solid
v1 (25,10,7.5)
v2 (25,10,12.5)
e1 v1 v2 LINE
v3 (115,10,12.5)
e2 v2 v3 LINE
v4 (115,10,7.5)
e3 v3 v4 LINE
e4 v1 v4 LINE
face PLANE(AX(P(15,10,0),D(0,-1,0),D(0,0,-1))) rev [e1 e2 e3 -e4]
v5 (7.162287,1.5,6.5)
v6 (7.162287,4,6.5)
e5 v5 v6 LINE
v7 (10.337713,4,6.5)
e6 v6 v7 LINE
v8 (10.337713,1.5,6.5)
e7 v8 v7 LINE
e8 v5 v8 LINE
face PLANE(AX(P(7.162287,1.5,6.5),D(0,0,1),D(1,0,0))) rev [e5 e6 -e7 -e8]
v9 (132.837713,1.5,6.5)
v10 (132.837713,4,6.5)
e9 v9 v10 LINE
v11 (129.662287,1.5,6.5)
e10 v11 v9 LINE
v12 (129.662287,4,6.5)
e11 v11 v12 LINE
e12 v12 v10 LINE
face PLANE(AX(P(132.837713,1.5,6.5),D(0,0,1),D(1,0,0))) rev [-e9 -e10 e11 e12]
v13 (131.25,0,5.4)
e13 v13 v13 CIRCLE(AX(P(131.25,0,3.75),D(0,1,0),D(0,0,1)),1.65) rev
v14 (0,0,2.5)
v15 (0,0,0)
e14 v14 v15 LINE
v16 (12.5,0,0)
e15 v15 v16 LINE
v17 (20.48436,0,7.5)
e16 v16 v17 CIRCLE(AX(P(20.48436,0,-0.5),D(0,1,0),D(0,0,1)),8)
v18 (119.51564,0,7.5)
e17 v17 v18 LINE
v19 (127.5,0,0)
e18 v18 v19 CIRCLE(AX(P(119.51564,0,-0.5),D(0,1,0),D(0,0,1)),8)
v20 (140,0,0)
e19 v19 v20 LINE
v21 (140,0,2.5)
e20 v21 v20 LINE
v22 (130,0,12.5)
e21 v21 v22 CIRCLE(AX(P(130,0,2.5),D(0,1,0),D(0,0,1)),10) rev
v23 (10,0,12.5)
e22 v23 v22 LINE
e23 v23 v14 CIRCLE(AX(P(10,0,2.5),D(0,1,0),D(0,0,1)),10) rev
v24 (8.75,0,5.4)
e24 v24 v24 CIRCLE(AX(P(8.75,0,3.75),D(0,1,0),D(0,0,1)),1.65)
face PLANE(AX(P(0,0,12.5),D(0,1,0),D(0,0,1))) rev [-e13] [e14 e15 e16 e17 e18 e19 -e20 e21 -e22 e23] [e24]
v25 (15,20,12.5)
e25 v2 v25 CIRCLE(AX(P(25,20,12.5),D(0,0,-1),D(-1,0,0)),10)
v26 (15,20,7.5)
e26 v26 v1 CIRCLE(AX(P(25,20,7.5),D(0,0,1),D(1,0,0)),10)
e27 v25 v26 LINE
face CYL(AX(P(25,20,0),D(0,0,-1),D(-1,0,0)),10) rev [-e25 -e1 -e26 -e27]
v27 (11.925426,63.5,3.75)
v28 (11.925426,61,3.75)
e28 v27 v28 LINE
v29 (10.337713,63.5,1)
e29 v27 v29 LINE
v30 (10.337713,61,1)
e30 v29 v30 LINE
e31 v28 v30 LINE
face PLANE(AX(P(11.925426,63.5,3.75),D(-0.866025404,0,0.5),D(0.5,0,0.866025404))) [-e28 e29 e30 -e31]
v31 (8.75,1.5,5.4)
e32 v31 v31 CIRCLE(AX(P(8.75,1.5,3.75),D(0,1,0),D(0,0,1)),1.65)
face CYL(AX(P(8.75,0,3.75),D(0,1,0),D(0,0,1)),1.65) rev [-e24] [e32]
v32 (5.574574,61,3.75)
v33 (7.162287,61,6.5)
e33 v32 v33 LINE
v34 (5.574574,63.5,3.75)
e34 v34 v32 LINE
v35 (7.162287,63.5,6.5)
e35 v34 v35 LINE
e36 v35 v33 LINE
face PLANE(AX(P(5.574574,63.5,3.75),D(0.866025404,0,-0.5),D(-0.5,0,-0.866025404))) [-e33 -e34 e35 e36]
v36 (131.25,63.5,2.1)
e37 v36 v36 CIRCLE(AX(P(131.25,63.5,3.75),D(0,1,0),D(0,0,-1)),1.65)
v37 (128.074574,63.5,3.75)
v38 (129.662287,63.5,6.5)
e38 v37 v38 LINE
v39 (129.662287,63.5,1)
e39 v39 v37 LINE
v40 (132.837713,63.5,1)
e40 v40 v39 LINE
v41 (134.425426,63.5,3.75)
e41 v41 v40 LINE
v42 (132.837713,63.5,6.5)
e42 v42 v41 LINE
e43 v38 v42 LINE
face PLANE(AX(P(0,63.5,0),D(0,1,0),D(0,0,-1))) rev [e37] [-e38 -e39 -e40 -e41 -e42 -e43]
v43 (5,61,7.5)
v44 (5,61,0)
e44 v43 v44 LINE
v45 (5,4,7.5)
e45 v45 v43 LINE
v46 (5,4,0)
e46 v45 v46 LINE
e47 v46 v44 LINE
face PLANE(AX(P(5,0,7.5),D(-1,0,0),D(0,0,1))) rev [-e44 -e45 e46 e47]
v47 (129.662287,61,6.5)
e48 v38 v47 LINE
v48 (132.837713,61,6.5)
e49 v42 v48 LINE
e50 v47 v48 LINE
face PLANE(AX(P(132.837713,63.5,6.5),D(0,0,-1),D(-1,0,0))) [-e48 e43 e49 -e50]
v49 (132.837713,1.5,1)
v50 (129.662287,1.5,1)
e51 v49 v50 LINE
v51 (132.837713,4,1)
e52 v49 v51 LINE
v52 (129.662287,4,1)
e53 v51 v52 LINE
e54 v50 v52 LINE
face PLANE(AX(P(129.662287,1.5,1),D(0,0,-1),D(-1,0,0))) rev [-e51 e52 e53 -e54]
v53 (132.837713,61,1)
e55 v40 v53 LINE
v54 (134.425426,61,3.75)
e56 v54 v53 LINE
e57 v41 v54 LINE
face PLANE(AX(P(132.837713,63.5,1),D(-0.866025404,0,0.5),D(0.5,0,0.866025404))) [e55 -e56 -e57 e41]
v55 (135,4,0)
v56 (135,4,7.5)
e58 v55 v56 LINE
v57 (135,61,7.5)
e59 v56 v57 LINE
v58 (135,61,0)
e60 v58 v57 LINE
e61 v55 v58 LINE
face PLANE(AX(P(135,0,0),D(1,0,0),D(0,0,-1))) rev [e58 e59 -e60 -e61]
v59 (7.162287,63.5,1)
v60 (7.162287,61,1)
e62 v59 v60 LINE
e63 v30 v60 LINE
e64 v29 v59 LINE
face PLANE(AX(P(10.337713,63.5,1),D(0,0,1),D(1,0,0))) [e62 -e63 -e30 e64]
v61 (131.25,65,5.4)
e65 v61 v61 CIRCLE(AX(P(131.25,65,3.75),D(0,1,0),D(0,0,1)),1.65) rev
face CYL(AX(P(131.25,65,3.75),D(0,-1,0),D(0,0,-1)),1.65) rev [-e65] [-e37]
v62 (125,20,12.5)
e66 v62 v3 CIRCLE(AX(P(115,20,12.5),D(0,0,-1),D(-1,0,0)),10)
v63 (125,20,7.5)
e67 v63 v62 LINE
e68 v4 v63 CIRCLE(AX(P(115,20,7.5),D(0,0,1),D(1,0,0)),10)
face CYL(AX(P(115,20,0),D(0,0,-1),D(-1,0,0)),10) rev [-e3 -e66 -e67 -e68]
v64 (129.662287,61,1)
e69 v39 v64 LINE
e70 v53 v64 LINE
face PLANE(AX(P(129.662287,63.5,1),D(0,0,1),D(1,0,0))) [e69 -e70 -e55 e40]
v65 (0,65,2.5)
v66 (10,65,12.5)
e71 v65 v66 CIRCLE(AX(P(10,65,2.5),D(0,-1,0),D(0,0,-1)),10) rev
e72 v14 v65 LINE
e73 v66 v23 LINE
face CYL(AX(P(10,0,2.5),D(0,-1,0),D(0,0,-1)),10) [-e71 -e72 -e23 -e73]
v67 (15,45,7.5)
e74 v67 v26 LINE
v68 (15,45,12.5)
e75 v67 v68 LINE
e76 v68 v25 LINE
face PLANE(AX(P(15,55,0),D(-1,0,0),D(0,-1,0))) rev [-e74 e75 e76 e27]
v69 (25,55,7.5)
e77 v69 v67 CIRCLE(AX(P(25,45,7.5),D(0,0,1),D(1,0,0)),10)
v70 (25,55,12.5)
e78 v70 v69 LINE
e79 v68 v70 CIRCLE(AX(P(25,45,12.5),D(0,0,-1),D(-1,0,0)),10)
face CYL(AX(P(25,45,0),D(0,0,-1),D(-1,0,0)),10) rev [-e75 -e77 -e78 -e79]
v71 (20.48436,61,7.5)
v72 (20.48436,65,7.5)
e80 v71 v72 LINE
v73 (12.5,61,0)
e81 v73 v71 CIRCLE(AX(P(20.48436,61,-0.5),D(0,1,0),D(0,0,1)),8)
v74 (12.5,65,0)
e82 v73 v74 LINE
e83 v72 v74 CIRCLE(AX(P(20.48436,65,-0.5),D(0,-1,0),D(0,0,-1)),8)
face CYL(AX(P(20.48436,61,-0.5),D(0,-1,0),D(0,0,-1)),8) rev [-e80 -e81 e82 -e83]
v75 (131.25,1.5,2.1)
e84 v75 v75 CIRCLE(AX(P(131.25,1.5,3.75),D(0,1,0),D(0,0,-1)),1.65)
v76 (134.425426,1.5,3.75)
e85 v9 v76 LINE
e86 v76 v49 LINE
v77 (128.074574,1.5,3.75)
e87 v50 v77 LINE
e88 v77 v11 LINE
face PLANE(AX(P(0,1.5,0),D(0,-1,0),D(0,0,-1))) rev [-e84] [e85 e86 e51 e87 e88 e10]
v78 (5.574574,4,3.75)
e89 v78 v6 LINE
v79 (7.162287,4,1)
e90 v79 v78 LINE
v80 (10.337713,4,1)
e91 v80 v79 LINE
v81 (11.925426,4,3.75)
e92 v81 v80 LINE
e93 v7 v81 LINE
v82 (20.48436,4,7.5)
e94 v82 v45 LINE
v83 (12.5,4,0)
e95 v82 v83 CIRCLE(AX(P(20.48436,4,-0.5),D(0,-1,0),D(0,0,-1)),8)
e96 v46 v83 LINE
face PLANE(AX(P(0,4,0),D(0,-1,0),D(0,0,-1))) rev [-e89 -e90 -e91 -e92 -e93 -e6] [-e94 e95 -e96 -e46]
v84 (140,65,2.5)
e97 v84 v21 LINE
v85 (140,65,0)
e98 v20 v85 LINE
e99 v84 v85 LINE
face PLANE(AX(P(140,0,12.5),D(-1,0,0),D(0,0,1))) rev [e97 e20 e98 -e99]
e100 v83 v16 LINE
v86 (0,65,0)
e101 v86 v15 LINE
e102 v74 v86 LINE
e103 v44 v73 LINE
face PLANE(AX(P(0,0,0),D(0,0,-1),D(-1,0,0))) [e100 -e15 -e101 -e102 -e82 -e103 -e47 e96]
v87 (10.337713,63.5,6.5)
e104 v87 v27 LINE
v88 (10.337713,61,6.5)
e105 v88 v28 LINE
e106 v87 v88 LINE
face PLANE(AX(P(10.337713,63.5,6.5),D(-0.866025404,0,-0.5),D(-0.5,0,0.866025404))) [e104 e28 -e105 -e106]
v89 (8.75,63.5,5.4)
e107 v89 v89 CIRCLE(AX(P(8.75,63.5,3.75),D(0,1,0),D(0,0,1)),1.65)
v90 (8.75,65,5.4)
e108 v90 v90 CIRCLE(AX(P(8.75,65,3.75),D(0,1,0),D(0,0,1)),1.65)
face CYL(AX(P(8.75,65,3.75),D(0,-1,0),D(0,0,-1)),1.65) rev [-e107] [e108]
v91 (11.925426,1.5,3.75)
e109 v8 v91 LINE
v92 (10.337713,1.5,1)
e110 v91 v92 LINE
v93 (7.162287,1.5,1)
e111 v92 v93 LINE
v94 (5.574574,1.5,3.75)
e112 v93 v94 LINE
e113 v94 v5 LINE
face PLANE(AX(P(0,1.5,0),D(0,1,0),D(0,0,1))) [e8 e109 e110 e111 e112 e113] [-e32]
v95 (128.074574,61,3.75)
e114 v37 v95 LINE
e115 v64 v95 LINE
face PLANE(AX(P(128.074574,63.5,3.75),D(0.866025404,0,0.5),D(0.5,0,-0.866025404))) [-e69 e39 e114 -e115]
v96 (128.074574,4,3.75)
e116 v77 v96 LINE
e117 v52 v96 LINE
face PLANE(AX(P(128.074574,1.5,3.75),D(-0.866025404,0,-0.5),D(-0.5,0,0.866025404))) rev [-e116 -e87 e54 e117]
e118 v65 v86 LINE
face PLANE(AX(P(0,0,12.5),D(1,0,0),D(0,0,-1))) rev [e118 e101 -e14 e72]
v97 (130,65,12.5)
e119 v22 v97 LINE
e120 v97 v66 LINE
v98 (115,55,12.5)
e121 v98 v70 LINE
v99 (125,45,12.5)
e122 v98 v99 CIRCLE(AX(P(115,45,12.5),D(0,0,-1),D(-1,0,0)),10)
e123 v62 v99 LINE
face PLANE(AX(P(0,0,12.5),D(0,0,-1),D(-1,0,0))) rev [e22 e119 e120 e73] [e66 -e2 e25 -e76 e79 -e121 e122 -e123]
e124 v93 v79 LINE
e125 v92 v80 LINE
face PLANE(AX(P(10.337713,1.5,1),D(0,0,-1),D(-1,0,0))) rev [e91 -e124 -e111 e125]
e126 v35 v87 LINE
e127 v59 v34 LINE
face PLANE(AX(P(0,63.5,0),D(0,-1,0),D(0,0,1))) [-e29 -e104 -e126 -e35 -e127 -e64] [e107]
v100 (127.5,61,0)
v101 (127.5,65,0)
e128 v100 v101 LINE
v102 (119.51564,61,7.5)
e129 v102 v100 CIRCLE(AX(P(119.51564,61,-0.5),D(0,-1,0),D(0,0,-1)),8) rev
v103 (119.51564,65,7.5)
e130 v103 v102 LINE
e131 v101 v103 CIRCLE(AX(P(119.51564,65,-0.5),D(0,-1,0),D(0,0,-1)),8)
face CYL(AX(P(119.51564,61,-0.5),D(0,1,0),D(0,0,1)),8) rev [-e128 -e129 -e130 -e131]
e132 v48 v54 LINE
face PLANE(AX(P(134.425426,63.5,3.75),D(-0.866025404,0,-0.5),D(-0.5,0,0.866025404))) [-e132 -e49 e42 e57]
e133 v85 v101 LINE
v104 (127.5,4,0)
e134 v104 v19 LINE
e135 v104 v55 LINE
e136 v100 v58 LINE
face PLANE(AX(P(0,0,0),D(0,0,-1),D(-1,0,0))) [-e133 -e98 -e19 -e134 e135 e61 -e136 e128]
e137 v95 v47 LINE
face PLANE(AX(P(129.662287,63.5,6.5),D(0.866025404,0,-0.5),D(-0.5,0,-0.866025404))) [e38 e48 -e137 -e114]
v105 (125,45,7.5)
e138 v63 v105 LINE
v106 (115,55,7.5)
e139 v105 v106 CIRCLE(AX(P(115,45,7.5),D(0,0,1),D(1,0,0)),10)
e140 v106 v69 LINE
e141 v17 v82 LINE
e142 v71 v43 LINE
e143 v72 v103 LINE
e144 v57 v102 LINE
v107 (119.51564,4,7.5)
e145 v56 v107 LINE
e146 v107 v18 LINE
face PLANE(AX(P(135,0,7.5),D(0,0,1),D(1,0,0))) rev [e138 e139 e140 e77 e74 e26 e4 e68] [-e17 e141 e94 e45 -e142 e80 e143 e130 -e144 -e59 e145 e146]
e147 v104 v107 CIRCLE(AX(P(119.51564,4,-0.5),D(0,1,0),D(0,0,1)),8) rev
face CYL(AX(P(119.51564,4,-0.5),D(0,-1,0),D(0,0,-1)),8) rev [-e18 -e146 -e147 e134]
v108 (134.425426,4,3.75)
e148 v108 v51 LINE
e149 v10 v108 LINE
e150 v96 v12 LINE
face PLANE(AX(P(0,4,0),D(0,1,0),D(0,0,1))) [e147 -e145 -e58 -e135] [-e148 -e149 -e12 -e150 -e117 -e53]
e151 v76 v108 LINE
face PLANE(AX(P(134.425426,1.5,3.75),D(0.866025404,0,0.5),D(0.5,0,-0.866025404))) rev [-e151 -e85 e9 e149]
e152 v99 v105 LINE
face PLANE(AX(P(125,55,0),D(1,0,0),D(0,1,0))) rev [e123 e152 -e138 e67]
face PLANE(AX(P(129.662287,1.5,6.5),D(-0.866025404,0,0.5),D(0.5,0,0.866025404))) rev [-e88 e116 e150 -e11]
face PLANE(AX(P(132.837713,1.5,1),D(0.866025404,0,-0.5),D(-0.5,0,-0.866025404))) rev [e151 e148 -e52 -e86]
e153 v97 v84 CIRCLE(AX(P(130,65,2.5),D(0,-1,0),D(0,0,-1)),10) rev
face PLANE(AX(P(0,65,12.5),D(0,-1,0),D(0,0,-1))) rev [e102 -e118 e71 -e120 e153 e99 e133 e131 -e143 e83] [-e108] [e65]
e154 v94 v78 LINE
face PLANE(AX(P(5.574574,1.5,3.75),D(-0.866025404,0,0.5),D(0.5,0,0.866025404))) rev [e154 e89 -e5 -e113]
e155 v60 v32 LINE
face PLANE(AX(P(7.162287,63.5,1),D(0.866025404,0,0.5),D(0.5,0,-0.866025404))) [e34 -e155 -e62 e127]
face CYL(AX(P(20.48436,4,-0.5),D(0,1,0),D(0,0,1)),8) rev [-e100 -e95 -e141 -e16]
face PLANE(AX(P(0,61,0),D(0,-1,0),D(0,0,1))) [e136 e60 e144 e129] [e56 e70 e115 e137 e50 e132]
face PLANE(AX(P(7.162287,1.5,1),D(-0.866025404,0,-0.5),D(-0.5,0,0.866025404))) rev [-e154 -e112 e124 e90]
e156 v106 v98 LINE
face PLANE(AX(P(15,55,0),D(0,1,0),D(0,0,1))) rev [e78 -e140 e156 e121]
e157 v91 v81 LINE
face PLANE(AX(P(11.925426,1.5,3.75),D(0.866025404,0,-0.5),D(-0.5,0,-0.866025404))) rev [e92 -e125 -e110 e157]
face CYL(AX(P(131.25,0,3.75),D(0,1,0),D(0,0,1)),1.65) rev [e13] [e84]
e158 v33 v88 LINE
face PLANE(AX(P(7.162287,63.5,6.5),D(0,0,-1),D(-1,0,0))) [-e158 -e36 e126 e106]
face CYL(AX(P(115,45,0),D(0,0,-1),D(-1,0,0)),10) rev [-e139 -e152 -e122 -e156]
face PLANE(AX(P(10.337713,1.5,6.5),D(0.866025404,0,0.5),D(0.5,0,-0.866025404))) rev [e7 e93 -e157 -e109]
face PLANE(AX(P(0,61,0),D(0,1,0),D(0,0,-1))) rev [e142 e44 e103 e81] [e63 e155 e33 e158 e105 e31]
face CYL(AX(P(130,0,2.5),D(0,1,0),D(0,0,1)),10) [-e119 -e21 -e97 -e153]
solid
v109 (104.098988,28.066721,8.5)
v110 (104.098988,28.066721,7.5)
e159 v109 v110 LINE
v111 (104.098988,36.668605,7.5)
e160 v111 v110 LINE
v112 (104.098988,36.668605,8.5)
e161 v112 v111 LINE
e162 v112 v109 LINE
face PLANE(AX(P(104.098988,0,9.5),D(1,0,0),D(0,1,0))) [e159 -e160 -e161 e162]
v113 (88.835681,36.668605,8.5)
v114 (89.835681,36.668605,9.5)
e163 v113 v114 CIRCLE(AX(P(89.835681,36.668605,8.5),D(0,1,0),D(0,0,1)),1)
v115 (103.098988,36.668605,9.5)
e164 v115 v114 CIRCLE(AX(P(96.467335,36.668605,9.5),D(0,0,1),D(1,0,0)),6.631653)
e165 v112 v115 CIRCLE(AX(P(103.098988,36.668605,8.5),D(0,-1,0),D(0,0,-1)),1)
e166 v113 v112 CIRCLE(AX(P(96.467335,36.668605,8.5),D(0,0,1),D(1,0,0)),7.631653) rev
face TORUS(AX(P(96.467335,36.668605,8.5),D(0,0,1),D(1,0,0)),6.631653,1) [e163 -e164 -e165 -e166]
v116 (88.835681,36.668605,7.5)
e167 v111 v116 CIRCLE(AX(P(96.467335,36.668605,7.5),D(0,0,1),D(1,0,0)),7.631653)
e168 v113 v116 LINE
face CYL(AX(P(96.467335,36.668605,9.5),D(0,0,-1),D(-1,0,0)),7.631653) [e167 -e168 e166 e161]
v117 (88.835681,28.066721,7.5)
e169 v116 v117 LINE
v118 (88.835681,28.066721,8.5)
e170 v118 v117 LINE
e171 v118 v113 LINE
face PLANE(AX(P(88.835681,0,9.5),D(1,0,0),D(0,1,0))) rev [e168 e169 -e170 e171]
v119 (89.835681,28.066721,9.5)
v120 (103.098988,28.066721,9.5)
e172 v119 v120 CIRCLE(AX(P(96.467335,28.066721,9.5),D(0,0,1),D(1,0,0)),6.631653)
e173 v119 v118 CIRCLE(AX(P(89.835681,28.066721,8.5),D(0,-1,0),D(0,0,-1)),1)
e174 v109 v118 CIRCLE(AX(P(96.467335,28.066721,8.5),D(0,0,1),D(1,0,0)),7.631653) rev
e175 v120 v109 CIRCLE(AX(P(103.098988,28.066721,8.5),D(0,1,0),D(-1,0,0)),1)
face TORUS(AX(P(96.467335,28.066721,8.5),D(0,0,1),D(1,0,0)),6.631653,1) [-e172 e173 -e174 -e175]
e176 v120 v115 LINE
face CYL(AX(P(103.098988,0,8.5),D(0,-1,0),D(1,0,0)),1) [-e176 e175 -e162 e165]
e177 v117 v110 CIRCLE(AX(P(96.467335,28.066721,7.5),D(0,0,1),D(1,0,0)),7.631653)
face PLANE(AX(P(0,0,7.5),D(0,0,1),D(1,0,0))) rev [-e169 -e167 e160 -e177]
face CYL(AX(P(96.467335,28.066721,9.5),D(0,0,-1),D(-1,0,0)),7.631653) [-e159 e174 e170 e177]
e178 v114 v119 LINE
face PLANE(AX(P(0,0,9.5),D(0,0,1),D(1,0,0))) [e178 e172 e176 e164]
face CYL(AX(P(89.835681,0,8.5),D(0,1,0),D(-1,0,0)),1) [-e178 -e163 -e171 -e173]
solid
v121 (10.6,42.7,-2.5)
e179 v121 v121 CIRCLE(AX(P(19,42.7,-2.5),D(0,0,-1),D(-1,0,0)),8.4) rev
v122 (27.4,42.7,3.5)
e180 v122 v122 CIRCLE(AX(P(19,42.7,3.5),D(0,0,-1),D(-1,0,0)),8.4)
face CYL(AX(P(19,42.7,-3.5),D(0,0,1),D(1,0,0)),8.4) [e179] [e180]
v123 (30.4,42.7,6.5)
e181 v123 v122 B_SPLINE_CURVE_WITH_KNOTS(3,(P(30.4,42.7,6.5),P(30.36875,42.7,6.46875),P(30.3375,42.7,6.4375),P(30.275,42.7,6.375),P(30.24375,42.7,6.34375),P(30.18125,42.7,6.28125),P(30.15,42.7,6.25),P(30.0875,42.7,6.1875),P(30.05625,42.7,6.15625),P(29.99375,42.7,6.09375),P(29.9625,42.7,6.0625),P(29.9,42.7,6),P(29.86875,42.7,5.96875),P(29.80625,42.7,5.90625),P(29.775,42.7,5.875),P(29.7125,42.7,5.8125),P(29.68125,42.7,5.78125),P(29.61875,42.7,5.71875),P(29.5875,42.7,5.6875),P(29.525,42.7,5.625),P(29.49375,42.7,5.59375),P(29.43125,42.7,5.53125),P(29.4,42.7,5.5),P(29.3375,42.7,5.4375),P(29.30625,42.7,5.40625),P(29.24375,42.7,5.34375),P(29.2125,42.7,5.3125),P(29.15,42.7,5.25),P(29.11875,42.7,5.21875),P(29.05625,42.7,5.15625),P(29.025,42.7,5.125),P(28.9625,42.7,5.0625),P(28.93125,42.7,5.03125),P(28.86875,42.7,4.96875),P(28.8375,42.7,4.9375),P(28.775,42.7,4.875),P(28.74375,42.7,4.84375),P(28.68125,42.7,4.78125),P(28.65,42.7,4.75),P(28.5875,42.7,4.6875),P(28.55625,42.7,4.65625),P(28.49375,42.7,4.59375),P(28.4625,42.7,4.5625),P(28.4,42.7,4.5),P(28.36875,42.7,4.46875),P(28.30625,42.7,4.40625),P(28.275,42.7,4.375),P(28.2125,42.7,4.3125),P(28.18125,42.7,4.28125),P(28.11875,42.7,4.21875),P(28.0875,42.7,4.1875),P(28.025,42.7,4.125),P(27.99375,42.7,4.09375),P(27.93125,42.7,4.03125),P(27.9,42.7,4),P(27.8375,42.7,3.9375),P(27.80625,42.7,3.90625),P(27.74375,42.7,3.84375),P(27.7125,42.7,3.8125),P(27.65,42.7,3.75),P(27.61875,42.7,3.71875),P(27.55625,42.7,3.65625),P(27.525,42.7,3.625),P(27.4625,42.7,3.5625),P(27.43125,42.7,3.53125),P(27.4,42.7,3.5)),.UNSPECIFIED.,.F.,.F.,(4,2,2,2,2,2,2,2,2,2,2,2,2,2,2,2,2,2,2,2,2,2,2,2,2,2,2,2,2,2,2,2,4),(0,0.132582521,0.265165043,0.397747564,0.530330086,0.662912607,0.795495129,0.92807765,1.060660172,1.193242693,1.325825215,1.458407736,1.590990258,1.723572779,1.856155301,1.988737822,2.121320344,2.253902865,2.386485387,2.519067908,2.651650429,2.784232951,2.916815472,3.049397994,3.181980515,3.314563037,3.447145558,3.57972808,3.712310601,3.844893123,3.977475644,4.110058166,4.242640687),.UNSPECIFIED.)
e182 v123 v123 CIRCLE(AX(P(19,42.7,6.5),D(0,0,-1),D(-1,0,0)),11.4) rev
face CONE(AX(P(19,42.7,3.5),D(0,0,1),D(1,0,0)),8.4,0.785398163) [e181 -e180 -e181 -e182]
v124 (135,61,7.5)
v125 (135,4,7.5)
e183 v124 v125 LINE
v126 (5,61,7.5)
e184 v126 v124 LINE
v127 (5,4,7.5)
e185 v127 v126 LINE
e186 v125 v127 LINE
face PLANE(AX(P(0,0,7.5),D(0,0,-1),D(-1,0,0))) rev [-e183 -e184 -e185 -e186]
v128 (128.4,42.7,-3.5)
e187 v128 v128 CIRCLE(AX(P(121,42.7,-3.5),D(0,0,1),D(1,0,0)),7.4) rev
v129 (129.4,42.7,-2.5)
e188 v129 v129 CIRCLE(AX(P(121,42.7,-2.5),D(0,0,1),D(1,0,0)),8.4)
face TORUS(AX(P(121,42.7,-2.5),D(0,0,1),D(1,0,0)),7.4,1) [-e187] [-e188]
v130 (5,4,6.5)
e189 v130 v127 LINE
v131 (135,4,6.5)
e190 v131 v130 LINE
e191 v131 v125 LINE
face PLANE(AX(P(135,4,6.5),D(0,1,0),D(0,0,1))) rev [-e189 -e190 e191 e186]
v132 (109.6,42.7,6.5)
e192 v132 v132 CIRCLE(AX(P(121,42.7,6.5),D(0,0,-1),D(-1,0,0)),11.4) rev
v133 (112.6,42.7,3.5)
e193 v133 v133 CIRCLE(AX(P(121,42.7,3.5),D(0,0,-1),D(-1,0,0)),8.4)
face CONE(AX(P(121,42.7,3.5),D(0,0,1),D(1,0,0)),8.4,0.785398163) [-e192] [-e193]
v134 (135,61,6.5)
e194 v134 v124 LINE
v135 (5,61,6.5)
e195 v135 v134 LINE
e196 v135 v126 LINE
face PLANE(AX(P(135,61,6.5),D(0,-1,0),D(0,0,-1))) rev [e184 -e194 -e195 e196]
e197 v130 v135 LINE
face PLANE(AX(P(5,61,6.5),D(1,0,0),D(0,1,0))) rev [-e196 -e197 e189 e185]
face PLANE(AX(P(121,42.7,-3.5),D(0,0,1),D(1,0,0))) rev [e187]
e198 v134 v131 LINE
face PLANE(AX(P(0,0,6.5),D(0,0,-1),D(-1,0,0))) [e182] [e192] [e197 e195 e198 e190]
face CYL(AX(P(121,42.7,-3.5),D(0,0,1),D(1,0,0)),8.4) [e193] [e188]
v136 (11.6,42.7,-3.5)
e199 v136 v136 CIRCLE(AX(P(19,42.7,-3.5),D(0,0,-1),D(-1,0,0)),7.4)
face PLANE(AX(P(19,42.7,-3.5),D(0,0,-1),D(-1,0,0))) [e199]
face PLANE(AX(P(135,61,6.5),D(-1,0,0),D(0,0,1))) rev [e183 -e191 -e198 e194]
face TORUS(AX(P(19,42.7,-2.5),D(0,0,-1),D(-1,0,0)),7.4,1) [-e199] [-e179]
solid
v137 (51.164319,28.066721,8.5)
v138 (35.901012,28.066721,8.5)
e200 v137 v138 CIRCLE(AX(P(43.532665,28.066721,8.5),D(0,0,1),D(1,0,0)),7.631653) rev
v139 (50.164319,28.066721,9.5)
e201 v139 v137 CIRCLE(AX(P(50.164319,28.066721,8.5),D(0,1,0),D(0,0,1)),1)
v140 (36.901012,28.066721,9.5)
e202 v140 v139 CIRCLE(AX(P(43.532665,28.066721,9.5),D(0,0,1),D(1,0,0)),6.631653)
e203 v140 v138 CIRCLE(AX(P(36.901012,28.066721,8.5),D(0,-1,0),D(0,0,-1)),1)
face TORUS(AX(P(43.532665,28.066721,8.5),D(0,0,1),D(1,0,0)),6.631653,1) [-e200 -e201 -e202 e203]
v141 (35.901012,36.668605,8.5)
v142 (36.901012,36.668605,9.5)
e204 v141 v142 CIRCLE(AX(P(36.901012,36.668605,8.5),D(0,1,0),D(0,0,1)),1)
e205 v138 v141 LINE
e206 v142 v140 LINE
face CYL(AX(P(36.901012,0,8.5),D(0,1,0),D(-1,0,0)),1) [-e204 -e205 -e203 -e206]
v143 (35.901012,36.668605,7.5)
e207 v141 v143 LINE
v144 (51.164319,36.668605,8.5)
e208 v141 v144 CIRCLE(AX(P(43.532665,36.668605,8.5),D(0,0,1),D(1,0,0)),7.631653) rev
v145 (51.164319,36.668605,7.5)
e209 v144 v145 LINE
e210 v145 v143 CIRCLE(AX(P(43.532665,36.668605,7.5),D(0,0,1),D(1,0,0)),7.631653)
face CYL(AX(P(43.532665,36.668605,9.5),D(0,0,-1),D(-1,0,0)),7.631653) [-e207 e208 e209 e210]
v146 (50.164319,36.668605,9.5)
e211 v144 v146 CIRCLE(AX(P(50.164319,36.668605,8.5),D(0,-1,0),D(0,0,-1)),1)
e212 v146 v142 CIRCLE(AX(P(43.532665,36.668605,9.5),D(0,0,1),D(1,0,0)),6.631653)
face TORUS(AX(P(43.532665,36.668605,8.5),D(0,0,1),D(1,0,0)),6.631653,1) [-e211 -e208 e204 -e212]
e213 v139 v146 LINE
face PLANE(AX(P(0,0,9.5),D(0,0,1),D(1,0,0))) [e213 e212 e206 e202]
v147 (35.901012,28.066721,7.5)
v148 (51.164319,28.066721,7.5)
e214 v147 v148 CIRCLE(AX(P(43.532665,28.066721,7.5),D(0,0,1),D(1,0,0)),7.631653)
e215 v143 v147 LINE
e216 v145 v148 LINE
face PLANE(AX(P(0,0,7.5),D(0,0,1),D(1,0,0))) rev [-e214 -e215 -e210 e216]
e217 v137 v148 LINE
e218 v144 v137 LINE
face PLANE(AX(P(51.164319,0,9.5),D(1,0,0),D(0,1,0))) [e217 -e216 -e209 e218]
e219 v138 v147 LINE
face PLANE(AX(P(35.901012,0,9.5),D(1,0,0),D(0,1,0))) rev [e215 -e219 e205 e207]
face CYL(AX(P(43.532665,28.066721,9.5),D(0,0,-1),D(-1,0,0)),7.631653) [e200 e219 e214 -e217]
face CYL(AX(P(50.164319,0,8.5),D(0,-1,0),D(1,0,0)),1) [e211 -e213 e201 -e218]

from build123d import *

# Parameters (mm, degrees)
SKETCH1_W             = 140
SKETCH1_H             = 65
BOSS_EXTRUDE1_DEPTH   = 12.5
SKETCH4_W             = 130
SKETCH4_H             = 7.5
CUT_EXTRUDE3_DEPTH    = 155.858806659
SKETCH2_W             = 110
SKETCH2_H             = 45
CUT_EXTRUDE1_DEPTH    = 155.858806659
FILLET1_R             = 10
FILLET2_R             = 10
SKETCH5_W             = 7.5
SKETCH5_H             = 7.5
BOSS_EXTRUDE2_DEPTH   = 4
SKETCH6_2_R           = 1.65
CUT_EXTRUDE5_DEPTH    = 154.222876882
SKETCH6_R             = 1.65
CUT_EXTRUDE4_DEPTH    = 2.5
FILLET3_R             = 8
MIRROR1_START         = 61
MIRROR1_DEPTH         = 4
MIRROR1_START_2       = 63.5
MIRROR1_2_OUTLINE_R   = 1.65
MIRROR1_2_DEPTH       = 1.5
SKETCH7_W             = 130
SKETCH7_H             = 57
BOSS_EXTRUDE3_DEPTH   = 1
BOSS_EXTRUDE4_DEPTH   = 2
BOSS_EXTRUDE4_2_DEPTH = 2
SKETCH9_R             = 8.4
BOSS_EXTRUDE6_DEPTH   = 10
BOSS_EXTRUDE6_2_DEPTH = 10
CHAMFER1_SIZE         = 3
FILLET5_R             = 1
FILLET6_R             = 1
FILLET7_R             = 1


# Read off the part's stored shape, not the designer's step: Mirror1
with BuildPart() as part:
    # Sketch1 → Boss-Extrude1 (new body)
    with BuildSketch(Plane.XY):
        with Locations((70, 32.5)):
            Rectangle(SKETCH1_W, SKETCH1_H)
    extrude(amount=BOSS_EXTRUDE1_DEPTH)

    # Sketch4 → Cut-Extrude3 (cut, through all)
    with BuildSketch(Plane(origin=(0, 65, 0), x_dir=(1, 0, 0), z_dir=(0, 1, 0))):
        with Locations((70, -3.75)):
            Rectangle(SKETCH4_W, SKETCH4_H)
    extrude(amount=-CUT_EXTRUDE3_DEPTH, mode=Mode.SUBTRACT)

    # Sketch2 → Cut-Extrude1 (cut, through all)
    with BuildSketch(Plane.XY.offset(12.5)):
        with Locations((70, 32.5)):
            Rectangle(SKETCH2_W, SKETCH2_H)
    extrude(amount=-CUT_EXTRUDE1_DEPTH, mode=Mode.SUBTRACT)

    # Fillet1
    fillet1_edges = [part.edges().sort_by_distance(p)[0] for p in [
        (125, 55, 10),
        (125, 10, 10),
        (15, 10, 10),
        (15, 55, 10),
    ]]
    fillet(fillet1_edges, radius=FILLET1_R)

    # Fillet2
    fillet2_edges = [part.edges().sort_by_distance(p)[0] for p in [
        (140, 32.5, 12.5),
        (0, 32.5, 12.5),
    ]]
    fillet(fillet2_edges, radius=FILLET2_R)

    # Sketch5 → Boss-Extrude2 (add)
    with BuildSketch(Plane.XZ):
        with Locations((8.75, 3.75)):
            Rectangle(SKETCH5_W, SKETCH5_H)
        with Locations((131.25, 3.75)):
            Rectangle(SKETCH5_W, SKETCH5_H)
    extrude(amount=-BOSS_EXTRUDE2_DEPTH)

    # Sketch6<2> → Cut-Extrude5 (cut, through all)
    with BuildSketch(Plane(origin=(0, 4, 0), x_dir=(1, 0, 0), z_dir=(0, 1, 0))):
        with Locations(Location((8.75, -3.75, 0), (0, 0, 270))):
            Circle(SKETCH6_2_R)
        with Locations(Location((131.25, -3.75, 0), (0, 0, 270))):
            Circle(SKETCH6_2_R)
    extrude(amount=-CUT_EXTRUDE5_DEPTH, mode=Mode.SUBTRACT)

    # Sketch6 → Cut-Extrude4 (cut)
    # profile 1 of 2: a face of its own
    with BuildSketch(Plane(origin=(0, 4, 0), x_dir=(1, 0, 0), z_dir=(0, 1, 0))):
        Polygon((11.925426481, -3.75), (10.33771324, -1), (7.16228676, -1), (5.574573519, -3.75), (7.16228676, -6.5), (10.33771324, -6.5), align=None)
        with Locations(Location((8.75, -3.75, 0), (0, 0, 270))):
            Circle(SKETCH6_R, mode=Mode.SUBTRACT)
    # profile 2 of 2: a face of its own
    with BuildSketch(Plane(origin=(0, 4, 0), x_dir=(1, 0, 0), z_dir=(0, 1, 0))):
        Polygon((134.425426481, -3.75), (132.83771324, -6.5), (129.66228676, -6.5), (128.074573519, -3.75), (129.66228676, -1), (132.83771324, -1), align=None)
        with Locations(Location((131.25, -3.75, 0), (0, 0, 270))):
            Circle(SKETCH6_R, mode=Mode.SUBTRACT)
    extrude(amount=-CUT_EXTRUDE4_DEPTH, mode=Mode.SUBTRACT)

    # Fillet3
    # the kernel refuses this fillet: 8 mm, written as the material it adds along each edge
    with BuildSketch(Plane(origin=(127.5, 0, 7.5), x_dir=(-1, 0, 0), z_dir=(0, 1, 0))) as fillet3_piece_1:
        with BuildLine():
            CenterArc((7.984359711, -8), FILLET3_R, 90, 86.416678302)
            Line((0, -7.5), (0, 0))
            Line((0, 0), (7.984359711, 0))
        make_face()
    extrude(amount=4)
    with BuildSketch(Plane(origin=(12.5, 0, 7.5), x_dir=(1, 0, 0), z_dir=(0, 1, 0))) as fillet3_piece_2:
        with BuildLine():
            CenterArc((7.984359711, 8), FILLET3_R, 183.583321698, 86.416678302)
            Line((0, 7.5), (0, 0))
            Line((0, 0), (7.984359711, 0))
        make_face()
    extrude(amount=4)

    # Mirror1 outline → Mirror1 (add)
    # profile 1 of 2: a face of its own
    with BuildSketch(Plane(origin=(0, 0, 0), x_dir=(1, 0, 0), z_dir=(0, 1, 0)).offset(MIRROR1_START)):
        with BuildLine():
            Line((135, -7.5), (135, 0))
            Line((135, 0), (127.5, 0))
            ThreePointArc((127.5, 0), (124.992865864, -5.330951895), (119.515640289, -7.5))
            Line((119.515640289, -7.5), (135, -7.5))
        make_face()
        Polygon((134.425426481, -3.75), (132.83771324, -6.5), (129.66228676, -6.5), (128.074573519, -3.75), (129.66228676, -1), (132.83771324, -1), align=None, mode=Mode.SUBTRACT)
    # profile 2 of 2: a face of its own
    with BuildSketch(Plane(origin=(0, 0, 0), x_dir=(1, 0, 0), z_dir=(0, 1, 0)).offset(MIRROR1_START)):
        with BuildLine():
            Line((5, -7.5), (20.484359711, -7.5))
            ThreePointArc((20.484359711, -7.5), (15.007134136, -5.330951895), (12.5, 0))
            Line((12.5, 0), (5, 0))
            Line((5, 0), (5, -7.5))
        make_face()
        Polygon((10.33771324, -1), (11.925426481, -3.75), (10.33771324, -6.5), (7.16228676, -6.5), (5.574573519, -3.75), (7.16228676, -1), align=None, mode=Mode.SUBTRACT)
    extrude(amount=MIRROR1_DEPTH)

    # Mirror1 2 outline → Mirror1 2 (add)
    # profile 1 of 2: a face of its own
    with BuildSketch(Plane(origin=(0, 0, 0), x_dir=(1, 0, 0), z_dir=(0, 1, 0)).offset(MIRROR1_START_2)):
        Polygon((10.33771324, -6.5), (11.925426481, -3.75), (10.33771324, -1), (7.16228676, -1), (5.574573519, -3.75), (7.16228676, -6.5), align=None)
        with Locations((8.75, -3.75)):
            Circle(MIRROR1_2_OUTLINE_R, mode=Mode.SUBTRACT)
    # profile 2 of 2: a face of its own
    with BuildSketch(Plane(origin=(0, 0, 0), x_dir=(1, 0, 0), z_dir=(0, 1, 0)).offset(MIRROR1_START_2)):
        Polygon((129.66228676, -6.5), (132.83771324, -6.5), (134.425426481, -3.75), (132.83771324, -1), (129.66228676, -1), (128.074573519, -3.75), align=None)
        with Locations((131.25, -3.75)):
            Circle(MIRROR1_2_OUTLINE_R, mode=Mode.SUBTRACT)
    extrude(amount=MIRROR1_2_DEPTH)


with BuildPart() as body_2:
    # Sketch7 → Boss-Extrude3 (new body)
    with BuildSketch(Plane(origin=(0, 0, 7.5), x_dir=(-1, 0, 0), z_dir=(0, 0, -1))):
        with Locations((-70, 32.5)):
            Rectangle(SKETCH7_W, SKETCH7_H)
    extrude(amount=BOSS_EXTRUDE3_DEPTH)


with BuildPart() as body_3:
    # Sketch8 → Boss-Extrude4 (new body)
    with BuildSketch(Plane.XY.offset(7.5)):
        with BuildLine():
            Line((35.901012383, 36.668605192), (35.901012383, 28.066721462))
            ThreePointArc((35.901012383, 28.066721462), (43.532665447, 20.435068399), (51.16431851, 28.066721462))
            Line((51.16431851, 28.066721462), (51.16431851, 36.668605192))
            ThreePointArc((51.16431851, 36.668605192), (43.532665447, 44.300258256), (35.901012383, 36.668605192))
        make_face()
    extrude(amount=BOSS_EXTRUDE4_DEPTH)

    # Fillet7
    fillet7_edges = [body_3.edges().sort_by_distance(p)[0] for p in [
        (43.532665447, 20.435068399, 9.5),
        (51.16431851, 32.367663327, 9.5),
        (43.532665447, 44.300258256, 9.5),
        (35.901012383, 32.367663327, 9.5),
    ]]
    fillet(fillet7_edges, radius=FILLET7_R)


with BuildPart() as body_4:
    # Sketch8 → Boss-Extrude4 2 (new body)
    with BuildSketch(Plane.XY.offset(7.5)):
        with BuildLine():
            Line((88.83568149, 36.668605192), (88.83568149, 28.066721462))
            ThreePointArc((88.83568149, 28.066721462), (96.467334553, 20.435068399), (104.098987617, 28.066721462))
            Line((104.098987617, 28.066721462), (104.098987617, 36.668605192))
            ThreePointArc((104.098987617, 36.668605192), (96.467334553, 44.300258256), (88.83568149, 36.668605192))
        make_face()
    extrude(amount=BOSS_EXTRUDE4_2_DEPTH)

    # Fillet6
    fillet6_edges = [body_4.edges().sort_by_distance(p)[0] for p in [
        (96.467334553, 20.435068399, 9.5),
        (104.098987617, 32.367663327, 9.5),
        (96.467334553, 44.300258256, 9.5),
        (88.83568149, 32.367663327, 9.5),
    ]]
    fillet(fillet6_edges, radius=FILLET6_R)


with BuildPart() as body_5:
    # Sketch9 → Boss-Extrude6 (new body)
    with BuildSketch(Plane(origin=(0, 0, 6.5), x_dir=(-1, 0, 0), z_dir=(0, 0, -1))):
        with Locations((-19, 42.7)):
            Circle(SKETCH9_R)
    extrude(amount=BOSS_EXTRUDE6_DEPTH)


with BuildPart() as body_6:
    # Sketch9 → Boss-Extrude6 2 (new body)
    with BuildSketch(Plane(origin=(0, 0, 6.5), x_dir=(-1, 0, 0), z_dir=(0, 0, -1))):
        with Locations(Location((-121, 42.7, 0), (0, 0, 180))):
            Circle(SKETCH9_R)
    extrude(amount=BOSS_EXTRUDE6_2_DEPTH)

    # Combine1: union body 2, body 5
    add(body_2.part)
    add(body_5.part)

    # Chamfer1
    chamfer1_edges = [body_6.edges().sort_by_distance(p)[0] for p in [
        (112.6, 42.7, 6.5),
        (27.4, 42.7, 6.5),
    ]]
    chamfer(chamfer1_edges, length=CHAMFER1_SIZE)

    # Fillet5
    fillet5_edges = [body_6.edges().sort_by_distance(p)[0] for p in [
        (112.6, 42.7, -3.5),
        (27.4, 42.7, -3.5),
    ]]
    fillet(fillet5_edges, radius=FILLET5_R)


solid = Compound([part.part, body_3.part, body_4.part, body_6.part])
